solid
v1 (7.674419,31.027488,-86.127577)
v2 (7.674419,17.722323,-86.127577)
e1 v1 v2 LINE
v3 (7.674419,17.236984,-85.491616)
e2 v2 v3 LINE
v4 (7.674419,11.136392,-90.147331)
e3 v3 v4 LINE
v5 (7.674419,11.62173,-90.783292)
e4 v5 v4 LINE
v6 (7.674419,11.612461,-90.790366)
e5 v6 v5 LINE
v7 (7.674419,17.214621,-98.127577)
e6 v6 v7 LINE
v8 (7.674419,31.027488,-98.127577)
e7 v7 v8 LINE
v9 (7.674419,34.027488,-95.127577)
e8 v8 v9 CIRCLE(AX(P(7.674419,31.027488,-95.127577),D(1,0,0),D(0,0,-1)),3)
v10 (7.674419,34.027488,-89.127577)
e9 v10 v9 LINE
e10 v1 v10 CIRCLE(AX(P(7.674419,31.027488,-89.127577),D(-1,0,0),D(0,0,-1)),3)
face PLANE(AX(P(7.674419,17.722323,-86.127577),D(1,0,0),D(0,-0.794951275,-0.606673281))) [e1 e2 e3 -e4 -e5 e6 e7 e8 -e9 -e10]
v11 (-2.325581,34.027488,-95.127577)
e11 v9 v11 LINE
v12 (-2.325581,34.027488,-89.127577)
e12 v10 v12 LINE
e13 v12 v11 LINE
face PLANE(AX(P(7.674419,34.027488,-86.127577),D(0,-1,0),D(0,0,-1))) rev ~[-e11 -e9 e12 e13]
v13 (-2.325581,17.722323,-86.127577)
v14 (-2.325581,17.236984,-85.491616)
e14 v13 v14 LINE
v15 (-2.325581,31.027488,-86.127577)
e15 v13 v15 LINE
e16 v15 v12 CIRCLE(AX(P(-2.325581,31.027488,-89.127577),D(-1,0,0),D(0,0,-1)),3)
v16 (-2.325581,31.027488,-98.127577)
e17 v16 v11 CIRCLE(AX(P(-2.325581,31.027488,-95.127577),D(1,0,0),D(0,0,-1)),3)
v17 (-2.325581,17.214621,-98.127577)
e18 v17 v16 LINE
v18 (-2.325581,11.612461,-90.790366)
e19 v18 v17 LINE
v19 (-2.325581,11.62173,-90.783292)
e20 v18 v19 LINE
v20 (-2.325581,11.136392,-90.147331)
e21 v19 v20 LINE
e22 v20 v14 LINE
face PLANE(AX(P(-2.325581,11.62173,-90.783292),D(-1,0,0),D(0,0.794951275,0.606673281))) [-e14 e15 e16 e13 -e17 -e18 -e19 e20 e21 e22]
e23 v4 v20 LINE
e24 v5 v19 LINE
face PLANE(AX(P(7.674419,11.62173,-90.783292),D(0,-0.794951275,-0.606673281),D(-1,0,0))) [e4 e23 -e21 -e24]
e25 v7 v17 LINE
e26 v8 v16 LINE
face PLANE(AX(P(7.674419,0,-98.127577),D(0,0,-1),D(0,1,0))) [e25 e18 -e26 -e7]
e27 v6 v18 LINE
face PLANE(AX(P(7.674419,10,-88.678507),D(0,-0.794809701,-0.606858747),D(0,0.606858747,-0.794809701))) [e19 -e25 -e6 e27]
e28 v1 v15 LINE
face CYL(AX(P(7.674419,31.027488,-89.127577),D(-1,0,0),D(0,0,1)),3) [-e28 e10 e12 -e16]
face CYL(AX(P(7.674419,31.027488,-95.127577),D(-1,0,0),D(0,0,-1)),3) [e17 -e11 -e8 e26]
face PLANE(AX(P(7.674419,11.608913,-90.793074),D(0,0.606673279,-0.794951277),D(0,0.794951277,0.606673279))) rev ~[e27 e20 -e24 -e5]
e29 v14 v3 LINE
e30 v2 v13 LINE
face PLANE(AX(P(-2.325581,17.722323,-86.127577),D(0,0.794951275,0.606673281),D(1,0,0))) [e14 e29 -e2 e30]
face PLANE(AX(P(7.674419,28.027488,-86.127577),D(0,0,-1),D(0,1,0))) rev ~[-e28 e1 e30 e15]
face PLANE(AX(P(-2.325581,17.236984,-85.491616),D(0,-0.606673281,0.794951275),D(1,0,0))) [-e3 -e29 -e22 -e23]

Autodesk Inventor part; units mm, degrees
ref_plane "YZ Plane" through (0, 0, 0) normal (1, 0, 0) x (0, 1, 0)
ref_plane "XZ Plane" through (0, 0, 0) normal (0, 1, 0) x (-1, 0, 0)
ref_plane "XY Plane" through (0, 0, 0) normal (0, 0, 1) x (1, 0, 0)
sketch "Sketch1" plane through (0, 0, 0) normal (0, 1, 0) x (-1, 0, 0)
  line L0 (2.325581, 24.418605) -> (-7.674419, 24.418605)
  line L1 (-7.674419, 24.418605) -> (-7.674419, -75.581395)
  line L2 (-7.674419, -75.581395) -> (2.325581, -75.581395)
  line L3 (2.325581, -75.581395) -> (2.325581, 24.418605)
  point P0 (0, 0)
  dimension "d2" = 100
  dimension "d3" = 10
extrude "Extrusion1" add sketch "Sketch1" along normal blind 10
sketch "Sketch9" plane through (7.674419, 0, 24.418605) normal (1, 0, 0) x (0, 0, -1)
  line L0 (0, 10) -> (100, 10) projected
  line L1 (0, 0) -> (100, 0) projected
  line L2 (0, 10) -> (100, 10)
  line L3 (100, 10) -> (100, 0)
  line L4 (100, 0) -> (0, 0)
  line L5 (0, 0) -> (0, 10)
  point P0 (24.418605, 0)
extrude "Extrusion8" cut sketch "Sketch9" against normal blind 5
sketch "Sketch10" plane through (2.674419, 0, 24.418605) normal (1, 0, 0) x (0, 0, -1)
  line L0 (100, 0) -> (100, 10) projected
  line L1 (100, 10) -> (126, 10)
  line L2 (126, 10) -> (126, 29.842)
  line L3 (126, 29.842) -> (100, 10)
  line L4 (126, 29.842) -> (126, 19.842)
  line L5 (126, 19.842) -> (100, 0)
  point P0 (24.418605, 0)
  dimension "d44" = 19.842
  dimension "d45" = 26
  dimension "d46" = 10
extrude "Extrusion9" add sketch "Sketch10" against normal blind 5 contours L0 L1 L5 | L3 L2 L5 L1
sketch "Sketch12" plane through (2.674419, 0, 24.418605) normal (1, 0, 0) x (0, 0, -1)
  line L0 (100, 0) -> (0, 0)
  line L1 (126, 29.842) -> (126, 19.842)
  line L2 (99.933064, 0) -> (126, 19.842)
  line L3 (126, 19.842) -> (126, 29.842)
  line L4 (126, 29.842) -> (99.933064, 10)
  line L5 (99.933064, 10) -> (99.933064, 0)
  point P0 (24.418605, 0)
extrude "Extrusion10" add sketch "Sketch12" along normal blind 5
sketch "Sketch13" plane through (2.674419, 0, 24.418605) normal (1, 0, 0) x (0, 0, -1)
  line L0 (100, 10) -> (0, 10) projected
  line L1 (100, 0) -> (0, 0) projected
  line L2 (0, 10) -> (100, 10)
  line L3 (100, 10) -> (100, 0)
  line L4 (100, 0) -> (0, 0)
  line L5 (0, 0) -> (0, 10)
  point P0 (24.418605, 0)
extrude "Extrusion11" add sketch "Sketch13" along normal blind 5
sketch "Sketch2" plane through (0, 10, 0) normal (0, 1, 0) x (1, 0, 0)
  line L0 (-2.325581, -24.418605) -> (7.674419, -24.418605)
  line L1 (7.674419, -24.418605) -> (7.674419, 75.581395)
  line L2 (-2.325581, -24.418605) -> (7.674419, -24.418605)
  line L3 (2.674419, -24.418605) -> (2.674419, -14.418605)
  line L4 (2.674419, -14.418605) -> (2.674419, -4.418605)
  line L5 (2.674419, -4.418605) -> (2.674419, 10.581395)
  line L6 (2.674419, 10.581395) -> (2.674419, 25.581395)
  line L7 (7.674419, 75.581395) -> (-2.325581, 75.581395)
  line L8 (-2.325581, 75.581395) -> (7.674419, 75.581395)
  line L9 (2.674419, -24.418605) -> (2.674419, 25.581395)
  line L10 (2.674419, 25.581395) -> (7.674419, 25.581395)
  line L11 (2.674419, 25.581395) -> (-2.325581, 25.581395)
  line L12 (-2.325581, 75.581395) -> (-2.325581, -24.418605)
  line L13 (2.674419, 25.581395) -> (2.674419, 40.581395)
  line L14 (2.674419, 25.581395) -> (2.674419, 75.581395)
  line L15 (2.674419, 0.581395) -> (-2.325581, 0.581395)
  line L16 (2.674419, 0.581395) -> (7.674419, 0.581395)
  line L17 (2.674419, 50.581395) -> (-2.325581, 50.581395)
  line L18 (7.674419, 50.581395) -> (2.674419, 50.581395)
  circle A0 centre (2.674419, 0.581395) radius 2
  circle A1 centre (2.674419, 25.581395) radius 2
  circle A2 centre (2.674419, 50.581395) radius 2
  point P0 (0, 0)
  dimension "d28" = 4
  dimension "d29" = 4
  dimension "d30" = 4
extrude "Extrusion2" cut sketch "Sketch2" against normal blind 10 contours A0 L5 L15 | L15 L5 A0 | A1 L13 L11 | L11 L6 A1 | L16 A0 L5 | L5 A0 L16 | L10 A1 L6 | L13 A1 L10 | A2 L14 L17 | L17 L14 A2 | L18 A2 L14 | L14 A2 L18
sketch "Sketch14" plane through (7.674419, 0, 24.418605) normal (1, 0, 0) x (0, 0, -1)
  line L0 (100, 10) -> (0, 10) projected
  line L1 (126, 19.842) -> (100, 0) projected
  line L2 (100, 10) -> (100, 0)
  point P0 (24.418605, 0)
sketch "Sketch16" plane through (7.674419, 0, 24.418605) normal (1, 0, 0) x (0, 0, -1)
  line L0 (100, 10) -> (126, 29.842)
  line L1 (100, 10) -> (112.896482, 19.842)
  line L2 (112.896482, 19.842) -> (113.514198, 20.313412)
  line L3 (113.514198, 20.313412) -> (118.329114, 14.004177)
  line L4 (117.711399, 13.532765) -> (112.884086, 19.858243)
  line L5 (117.711399, 13.532765) -> (118.329114, 14.004177)
  point P0 (24.418605, 0)
  dimension "d60" = 16.22295
  dimension "d61" = 0.77705
extrude "Extrusion13" add sketch "Sketch16" against normal blind 10
sketch "Sketch20" plane through (7.674419, 0, 24.418605) normal (1, 0, 0) x (0, 0, -1)
  line L0 (100, 10) -> (0, 10) projected
  line L1 (100, 10) -> (128, 10)
  line L2 (128, 10) -> (128, 0)
  line L3 (128, 0) -> (100, 0)
  line L4 (100, 0) -> (100, 10)
  line L5 (126, 29.842) -> (100, 10) projected
  line L6 (100, 10) -> (126, 10)
  line L7 (126, 10) -> (126, 29.842)
  line L8 (126, 29.842) -> (100, 29.842)
  line L9 (100, 29.842) -> (100, 10)
  point P0 (24.418605, 0)
  dimension "d77" = 28
extrude "Extrusion17" add sketch "Sketch20" against normal blind 10 contours L1 L2 L3 L4
sketch "Sketch21" plane through (7.674419, 0, 24.418605) normal (1, 0, 0) x (0, 0, -1)
  line L0 (128, 0) -> (128, 10)
  line L1 (128, 0) -> (151.87052, 18.170101)
  line L2 (113.070317, 10) -> (126, 19.842)
  line L3 (128, 10) -> (151.239467, 27.689747)
  line L4 (151.87052, 18.170101) -> (151.87052, 28.170101)
  line L5 (151.87052, 28.170101) -> (151.239467, 27.689747)
  line L6 (100, 10) -> (0, 10)
  line L7 (126, 29.842) -> (100, 29.842)
  line L8 (100, 29.842) -> (100, 10)
  line L9 (100, 10) -> (126, 10)
  line L10 (126, 10) -> (126, 29.842)
  point P0 (24.418605, 0)
extrude "Extrusion18" add sketch "Sketch21" against normal blind 10 contours L0 L3 L5 L4 L1
sketch "Sketch22" plane through (7.674419, 0, 24.418605) normal (1, 0, 0) x (0, 0, -1)
  line L0 (100, 10) -> (126, 29.842) projected
  line L1 (100, 10) -> (0, 10) projected
  line L2 (126, 29.842) -> (100, 29.842)
  line L3 (100, 29.842) -> (100, 10)
  line L4 (100, 10) -> (126, 10)
  line L5 (126, 10) -> (126, 29.842)
  point P0 (24.418605, 0)
extrude "Extrusion19" cut sketch "Sketch22" against normal blind 10
sketch "Sketch23" plane through (7.674419, 0, 24.418605) normal (1, 0, 0) x (0, 0, -1)
  line L0 (151.87052, 18.170101) -> (128, 0)
  line L1 (141.891396, 10.57405) -> (136.99663, 17.004426)
  line L2 (128, 0) -> (151.87052, 18.170101)
  line L3 (128, 10) -> (151.87052, 28.170101)
  line L4 (137.071931, 16.905501) -> (151.87052, 28.170101)
  line L5 (151.87052, 28.170101) -> (151.87052, 18.170101)
  line L6 (141.891396, 10.57405) -> (151.87052, 18.170101)
  point P0 (24.418605, 0)
  point P1 (137.071931, 16.905501)
extrude "Extrusion20" cut sketch "Sketch23" against normal blind 10
sketch "Sketch24" plane through (7.674419, 0, 24.418605) normal (1, 0, 0) x (0, 0, -1)
  line L0 (141.891396, 10.57405) -> (137.071931, 16.905501)
  line L1 (137.071931, 16.905501) -> (120.042183, 39.277911)
  line L2 (120.042183, 39.277911) -> (114.78111, 35.273213)
  line L3 (114.78111, 35.273213) -> (131.810859, 12.900804)
  line L4 (128, 10) -> (137.071931, 16.905501)
  line L5 (130.433663, 25.626361) -> (125.172591, 21.621663)
  point P0 (24.418605, 0)
extrude "Extrusion21" add sketch "Sketch24" against normal blind 10 contours L4 L3 L5 L1
sketch "Sketch25" plane through (7.674419, 0, 24.418605) normal (1, 0, 0) x (0, 0, -1)
  circle A0 centre (130.028114, 20.963065) radius 1.414214
  line L0 (128, 0) -> (141.891396, 10.57405)
  point P0 (24.418605, 0)
  dimension "d88" = 15.452
extrude "Extrusion22" cut sketch "Sketch25" against normal blind 10
sketch "Sketch26" plane through (7.674419, 0, 24.418605) normal (1, 0, 0) x (0, 0, -1)
  line L0 (146.180534, 13.38523) -> (129.005429, 0.311641)
  line L1 (128, 0) -> (141.891396, 10.57405)
  line L2 (129.005429, 0.311641) -> (127.101128, -1.137903)
  line L3 (128, 0) -> (128.596019, 0)
  line L4 (128, 10) -> (141.733271, 10)
  point P0 (24.418605, 0)
  point P1 (137.592982, 6.848436)
  point P2 (141.137252, 10)
  dimension "d89" = 0.361
extrude "Extrusion23" add sketch "Sketch26" against normal blind 10
sketch "Sketch27" plane through (7.674419, 0, 24.418605) normal (1, 0, 0) x (0, 0, -1)
  line L0 (128.596019, 0) -> (141.733271, 10)
  line L1 (141.733271, 10) -> (143.644553, 11.454856)
  line L2 (141.733271, 10) -> (141.137252, 10)
  line L3 (141.733271, 10) -> (141.137252, 10)
  line L4 (141.137252, 10) -> (143.4259, 11.742106)
  line L5 (143.4259, 11.742106) -> (143.644553, 11.454856)
  line L6 (143.4259, 11.742106) -> (141.608381, 14.129826)
  line L7 (141.608381, 14.129826) -> (140.073877, 12.96177)
  line L8 (130.433663, 25.626361) -> (141.891396, 10.57405)
  line L9 (141.891396, 10.57405) -> (140.073877, 12.96177)
  line L10 (141.891396, 10.57405) -> (130.433663, 25.626361)
  point P0 (24.418605, 0)
  dimension "d92" = 2.402
extrude "Extrusion24" add sketch "Sketch27" against normal blind 10
sketch "Sketch28" plane through (7.674419, 0, 24.418605) normal (1, 0, 0) x (0, 0, -1)
  line L0 (129.774875, 26.828636) -> (140.680759, 12.501302)
  line L1 (140.073877, 12.96177) -> (130.433663, 25.626361)
  line L2 (130.433663, 25.626361) -> (130.595987, 25.749921)
  line L3 (140.073877, 12.96177) -> (141.608381, 14.129826)
  line L4 (140.073877, 12.96177) -> (140.2362, 13.08533)
  line L5 (140.073877, 12.96177) -> (130.433663, 25.626361)
  point P0 (24.418605, 0)
  dimension "d95" = 0.204
extrude "Extrusion25" add sketch "Sketch28" against normal blind 10
sketch "Sketch29" plane through (7.674419, 0, 24.418605) normal (1, 0, 0) x (0, 0, -1)
  line L0 (130.595987, 25.749921) -> (140.2362, 13.08533)
  line L1 (130.595987, 25.749921) -> (115.000185, 13.878487)
  line L2 (143.644553, 11.454856) -> (128.596019, 0)
  line L3 (137.494115, 6.773179) -> (119.565826, 30.326023)
  line L4 (122.798086, 19.814204) -> (116.546182, 28.027488)
  line L5 (116.546182, 28.027488) -> (116.546182, 10)
  line L6 (0, 10) -> (128, 10)
  line L7 (128, 10) -> (100, 10)
  line L8 (116.546182, 28.027488) -> (110.546182, 28.027488)
  line L9 (110.546182, 28.027488) -> (110.546182, 34.027488)
  line L10 (116.546182, 28.027488) -> (122.546182, 28.027488)
  line L11 (122.546182, 28.027488) -> (122.546182, 10)
  line L12 (110.546182, 34.027488) -> (122.546182, 34.027488)
  line L13 (122.546182, 34.027488) -> (122.546182, 10)
  line L14 (122.546182, 10) -> (110.546182, 10)
  line L15 (110.546182, 10) -> (110.546182, 34.027488)
  point P0 (24.418605, 0)
  point P1 (122.546182, 28.027488)
  point P2 (110.546182, 28.027488)
  point P3 (110.546182, 10)
  point P4 (122.546182, 10)
  dimension "d98" = 19.6
  dimension "d99" = 29.6
  dimension "d101" = 6
  dimension "d102" = 6
  dimension "d103" = 6
extrude "Extrusion26" add sketch "Sketch29" against normal blind 10 contours L11 L4 L10 L3 | L3 L10 L11 | L11 L6 L5 L1 | L1 L5 L4 L11 | L10 L8 L9 L12 L13 | L5 L6 L15 L8
sketch "Sketch30" plane through (7.674419, 0, 24.418605) normal (1, 0, 0) x (0, 0, -1)
  line L0 (122.546182, 34.027488) -> (122.546182, 10)
  line L1 (122.546182, 34.027488) -> (144, 34.027488)
  line L2 (144, 34.027488) -> (144, 0)
  line L3 (144, 0) -> (122.546182, 0)
  line L4 (122.546182, 0) -> (122.546182, 34.027488)
  point P0 (24.418605, 0)
extrude "Extrusion27" cut sketch "Sketch30" against normal blind 10
sketch "Sketch31" plane through (7.674419, 0, 24.418605) normal (1, 0, 0) x (0, 0, -1)
  line L0 (110.546182, 34.027488) -> (110.546182, 10)
  line L1 (110.546182, 10) -> (113, 10)
  line L2 (110.546182, 10) -> (114, 10)
  line L3 (114, 10) -> (114, 17)
  line L4 (114, 17) -> (110.546182, 17)
  line L5 (110.546182, 17) -> (110.546182, 10)
  point P0 (24.418605, 0)
extrude "Extrusion28" cut sketch "Sketch31" against normal blind 10
sketch "Sketch32" plane through (7.674419, 0, 24.418605) normal (1, 0, 0) x (0, 0, -1)
  line L0 (114, 17) -> (110.546182, 17)
  line L1 (114, 17) -> (114, 10)
  line L2 (110.546182, 17) -> (114, 10)
  line L3 (114, 10) -> (114, 17)
  line L4 (114, 17) -> (110.546182, 17)
  point P0 (24.418605, 0)
extrude "Extrusion29" add sketch "Sketch32" against normal blind 10
sketch "Sketch33" plane through (7.674419, 0, 24.418605) normal (1, 0, 0) x (0, 0, -1)
  line L0 (100, 10.050951) -> (99.933064, 10)
  line L1 (100, 10.050951) -> (99.933064, 10)
  line L2 (99.933064, 10) -> (100, 10)
  line L3 (99.933064, 10) -> (100, 10)
  line L4 (100, 10) -> (100, 10.050951)
  line L5 (100, 10) -> (100, 10.050951)
  point P0 (24.418605, 0)
extrude "Extrusion30" cut sketch "Sketch33" against normal blind 10
sketch "Sketch34" plane through (7.674419, 0, 24.418605) normal (1, 0, 0) x (0, 0, -1)
  line L0 (119.614525, 21.220993) -> (127.725416, 4.782304)
  line L1 (110.546182, 17) -> (114, 10)
  line L2 (127.725416, 4.782304) -> (130.085017, 0)
  line L3 (122.546182, 0) -> (0, 0)
  line L4 (116.504679, 0) -> (130.085017, 0)
  line L5 (127.725416, 4.782304) -> (130.085017, 0)
  line L6 (122.546182, 34.027488) -> (122.546182, 0)
  line L7 (122.546182, 15.279278) -> (122.546182, 0)
  point P0 (24.418605, 0)
  dimension "d114" = 10
extrude "Extrusion31" add sketch "Sketch34" against normal blind 10
fillet "Fillet2" radius 2 1 edges at (2.6744, 0, -105.6664)
fillet "Fillet3" radius 3 6 edges at (2.6744, 15.2793, -98.1276) (2.6744, 34.0275, -98.1276) (2.6744, 34.0275, -86.1276) (2.6744, 17, -86.1276) (2.6744, 10, 24.4186) (2.6744, 0, 24.4186)
sketch "Sketch35" plane through (7.674419, 0, 24.418605) normal (1, 0, 0) x (0, 0, -1)
  arc A0 (110.546182, 17.699829) -> (110.855838, 16.372406) centre (113.546182, 17.699829) ccw
  line L0 (110.546182, 17.699829) -> (115.999721, 10.054757)
  line L1 (115.999721, 10.054757) -> (113.999721, 10.054757)
  line L2 (110.546182, 17.699829) -> (110.546182, 10.054757)
  line L3 (110.546182, 10.054757) -> (115.999721, 10.054757)
  line L4 (114, 10) -> (3, 10)
  line L5 (110.546182, 10.054757) -> (115.999721, 10.054757)
  point P0 (24.418605, 0)
  point P1 (3, 10)
extrude "Extrusion32" cut sketch "Sketch35" against normal blind 10
sketch "Sketch36" plane through (7.674419, 0, 24.418605) normal (1, 0, 0) x (0, 0, -1)
  line L0 (107, 10) -> (116.657393, 10)
  line L1 (110.546182, 17.699829) -> (115.999721, 10.054757)
  line L2 (3, 0) -> (126.868013, 0)
  line L3 (126, 19.842105) -> (100, 0)
  line L4 (114.482105, 12.631671) -> (116.575951, 9.696402)
  line L5 (115.211679, 11.608913) -> (109.490162, 19.106074)
  line L6 (110.546182, 31.027488) -> (110.546182, 17.699829)
  line L7 (110.546182, 17.699829) -> (110.546182, 10)
  line L8 (110.546182, 10) -> (116.359382, 10)
  point P0 (24.418605, 0)
  point P1 (110.546182, 17.722323)
  dimension "d121" = 0.261
extrude "Extrusion33" cut sketch "Sketch36" against normal blind 10
fillet "Fillet4" radius 1 2 edges at (2.6744, 10, -91.9408) (2.6744, 11.6089, -90.7931)
sketch "Sketch37" plane through (7.674419, 0, 24.418605) normal (1, 0, 0) x (0, 0, -1)
  line L0 (122.546182, 15.979107) -> (122.546182, 31.027488)
  line L1 (122.546182, 17.214621) -> (138.398773, 0)
  line L2 (138.398773, 0) -> (100, 0)
  line L3 (100, 0) -> (122.546182, 17.214621)
  line L4 (0, 10) -> (129.189978, 10)
  line L5 (0, 10) -> (0, 0)
  line L6 (0, 0) -> (138.398773, 0)
  point P0 (24.418605, 0)
  point P1 (113.097112, 10)
extrude "Extrusion34" cut sketch "Sketch37" against normal blind 10
sketch "Sketch38" plane through (-2.325581, 17.722323, -86.127577) normal (0, -0.6066733, 0.7949513) x (1, 0, 0)
  line L0 (0, 0) -> (0, 10.576957)
  line L1 (10, -7.674172) -> (0, -7.674172)
  line L2 (0, 0) -> (10, 0)
  line L3 (10, 0) -> (10, -7.674172)
  line L4 (10, -7.674172) -> (0, -7.674172)
  line L5 (0, -7.674172) -> (0, 0)
  point P0 (2.325581, 38.162919)
  point P1 (0, -7.674172)
extrude "Extrusion35" add sketch "Sketch38" along normal blind 0.8
equation "\"d0\" = d3"
properties part number "rod"
